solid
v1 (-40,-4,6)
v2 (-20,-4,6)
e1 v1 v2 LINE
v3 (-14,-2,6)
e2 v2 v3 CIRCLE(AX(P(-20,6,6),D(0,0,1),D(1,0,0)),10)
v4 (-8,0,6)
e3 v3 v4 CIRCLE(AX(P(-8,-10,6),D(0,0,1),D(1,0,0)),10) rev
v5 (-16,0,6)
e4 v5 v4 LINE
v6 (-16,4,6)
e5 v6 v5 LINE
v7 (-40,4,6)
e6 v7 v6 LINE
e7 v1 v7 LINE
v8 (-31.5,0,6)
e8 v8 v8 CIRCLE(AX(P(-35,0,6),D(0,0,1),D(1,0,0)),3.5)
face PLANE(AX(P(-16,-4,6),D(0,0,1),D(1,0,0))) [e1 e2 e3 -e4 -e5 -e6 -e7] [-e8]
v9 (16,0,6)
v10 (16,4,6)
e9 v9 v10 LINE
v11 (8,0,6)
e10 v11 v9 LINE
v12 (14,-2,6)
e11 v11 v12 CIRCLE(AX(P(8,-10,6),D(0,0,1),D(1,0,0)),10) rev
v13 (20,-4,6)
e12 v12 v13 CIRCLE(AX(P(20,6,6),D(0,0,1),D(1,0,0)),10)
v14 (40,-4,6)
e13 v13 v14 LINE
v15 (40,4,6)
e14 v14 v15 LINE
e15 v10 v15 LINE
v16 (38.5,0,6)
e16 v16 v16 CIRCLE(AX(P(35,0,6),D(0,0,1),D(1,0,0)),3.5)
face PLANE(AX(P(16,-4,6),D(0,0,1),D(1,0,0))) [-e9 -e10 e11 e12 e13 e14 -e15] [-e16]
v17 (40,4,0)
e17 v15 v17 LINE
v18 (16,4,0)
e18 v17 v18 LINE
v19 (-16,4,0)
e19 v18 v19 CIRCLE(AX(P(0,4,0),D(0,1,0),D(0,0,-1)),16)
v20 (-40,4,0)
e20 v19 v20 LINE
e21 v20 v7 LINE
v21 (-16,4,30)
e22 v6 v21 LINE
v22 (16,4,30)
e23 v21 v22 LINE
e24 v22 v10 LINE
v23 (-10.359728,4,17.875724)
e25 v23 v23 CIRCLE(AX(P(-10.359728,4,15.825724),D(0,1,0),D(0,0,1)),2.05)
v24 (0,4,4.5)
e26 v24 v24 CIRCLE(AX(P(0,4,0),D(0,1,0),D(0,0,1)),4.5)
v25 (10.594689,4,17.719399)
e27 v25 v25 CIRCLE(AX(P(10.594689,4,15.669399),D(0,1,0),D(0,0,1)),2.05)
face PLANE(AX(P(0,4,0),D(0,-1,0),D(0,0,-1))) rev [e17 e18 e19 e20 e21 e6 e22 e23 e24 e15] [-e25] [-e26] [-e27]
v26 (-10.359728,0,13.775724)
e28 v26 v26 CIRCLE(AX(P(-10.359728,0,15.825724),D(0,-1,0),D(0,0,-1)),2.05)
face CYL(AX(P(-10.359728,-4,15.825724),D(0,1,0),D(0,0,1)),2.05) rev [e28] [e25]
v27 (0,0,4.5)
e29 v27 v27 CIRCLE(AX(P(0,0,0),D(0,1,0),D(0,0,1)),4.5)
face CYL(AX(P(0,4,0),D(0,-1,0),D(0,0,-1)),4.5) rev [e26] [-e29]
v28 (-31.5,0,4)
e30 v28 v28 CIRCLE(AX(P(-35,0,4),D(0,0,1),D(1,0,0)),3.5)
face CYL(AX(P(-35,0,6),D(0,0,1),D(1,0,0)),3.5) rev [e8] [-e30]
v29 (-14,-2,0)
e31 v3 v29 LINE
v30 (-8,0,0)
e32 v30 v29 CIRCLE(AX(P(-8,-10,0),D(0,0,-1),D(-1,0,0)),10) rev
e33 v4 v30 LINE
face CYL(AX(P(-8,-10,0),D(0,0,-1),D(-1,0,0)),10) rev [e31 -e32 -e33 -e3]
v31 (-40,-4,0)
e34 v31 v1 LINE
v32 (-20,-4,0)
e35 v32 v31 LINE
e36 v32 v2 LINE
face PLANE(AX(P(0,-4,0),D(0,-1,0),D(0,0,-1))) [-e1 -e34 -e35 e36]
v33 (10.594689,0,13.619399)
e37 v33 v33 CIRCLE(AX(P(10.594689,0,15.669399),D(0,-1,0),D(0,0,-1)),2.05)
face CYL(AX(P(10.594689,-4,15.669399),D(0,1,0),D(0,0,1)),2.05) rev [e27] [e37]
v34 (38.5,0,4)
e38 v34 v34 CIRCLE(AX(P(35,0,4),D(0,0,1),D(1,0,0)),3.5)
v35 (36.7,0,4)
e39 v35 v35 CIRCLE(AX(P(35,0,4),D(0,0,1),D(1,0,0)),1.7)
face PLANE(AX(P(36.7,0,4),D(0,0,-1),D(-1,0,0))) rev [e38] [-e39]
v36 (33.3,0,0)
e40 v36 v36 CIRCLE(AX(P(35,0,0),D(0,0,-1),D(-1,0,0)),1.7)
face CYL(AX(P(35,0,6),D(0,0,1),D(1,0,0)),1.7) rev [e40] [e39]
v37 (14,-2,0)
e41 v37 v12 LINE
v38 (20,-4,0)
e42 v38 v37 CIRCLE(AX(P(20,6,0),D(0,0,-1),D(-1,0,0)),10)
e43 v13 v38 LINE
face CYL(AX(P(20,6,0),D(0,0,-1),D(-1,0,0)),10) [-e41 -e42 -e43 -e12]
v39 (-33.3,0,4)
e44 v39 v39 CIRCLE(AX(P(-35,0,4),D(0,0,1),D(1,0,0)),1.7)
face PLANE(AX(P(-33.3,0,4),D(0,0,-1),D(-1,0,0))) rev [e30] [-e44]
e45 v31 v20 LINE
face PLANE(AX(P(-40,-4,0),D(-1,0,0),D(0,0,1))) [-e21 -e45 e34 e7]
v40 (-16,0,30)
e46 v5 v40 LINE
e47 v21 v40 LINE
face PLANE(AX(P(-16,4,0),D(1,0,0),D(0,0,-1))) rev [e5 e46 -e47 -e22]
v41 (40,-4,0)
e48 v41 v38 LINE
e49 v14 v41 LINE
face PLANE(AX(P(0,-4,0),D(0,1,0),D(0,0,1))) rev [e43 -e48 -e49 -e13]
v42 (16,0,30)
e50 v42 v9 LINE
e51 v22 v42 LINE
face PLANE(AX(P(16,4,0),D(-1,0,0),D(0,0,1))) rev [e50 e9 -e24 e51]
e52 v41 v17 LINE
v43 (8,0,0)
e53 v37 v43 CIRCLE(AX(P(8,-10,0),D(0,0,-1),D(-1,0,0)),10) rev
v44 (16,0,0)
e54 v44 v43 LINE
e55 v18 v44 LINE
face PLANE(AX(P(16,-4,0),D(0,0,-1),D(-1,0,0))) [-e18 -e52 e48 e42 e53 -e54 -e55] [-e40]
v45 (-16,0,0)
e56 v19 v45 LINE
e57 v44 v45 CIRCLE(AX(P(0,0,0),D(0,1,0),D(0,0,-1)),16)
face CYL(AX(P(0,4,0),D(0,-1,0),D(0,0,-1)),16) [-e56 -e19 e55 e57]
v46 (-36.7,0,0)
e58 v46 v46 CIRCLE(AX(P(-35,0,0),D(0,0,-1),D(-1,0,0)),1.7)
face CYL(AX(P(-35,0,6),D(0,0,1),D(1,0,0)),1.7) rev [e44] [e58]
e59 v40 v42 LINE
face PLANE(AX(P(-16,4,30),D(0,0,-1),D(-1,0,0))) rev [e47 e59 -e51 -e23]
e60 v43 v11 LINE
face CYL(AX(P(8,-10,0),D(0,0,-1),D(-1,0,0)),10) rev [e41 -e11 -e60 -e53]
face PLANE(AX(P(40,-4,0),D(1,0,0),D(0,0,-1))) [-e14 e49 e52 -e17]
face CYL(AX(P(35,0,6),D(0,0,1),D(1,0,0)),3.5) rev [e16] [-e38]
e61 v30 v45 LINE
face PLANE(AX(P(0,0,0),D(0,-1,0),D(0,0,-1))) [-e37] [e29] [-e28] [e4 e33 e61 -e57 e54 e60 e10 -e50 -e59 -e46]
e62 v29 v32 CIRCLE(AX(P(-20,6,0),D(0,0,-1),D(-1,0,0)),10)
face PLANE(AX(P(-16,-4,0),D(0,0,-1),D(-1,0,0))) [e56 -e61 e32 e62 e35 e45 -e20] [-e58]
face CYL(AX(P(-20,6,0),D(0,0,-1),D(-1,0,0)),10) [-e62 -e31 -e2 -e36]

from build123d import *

# Parameters (mm, degrees)
SKETCH1_R                                            = 4.5
BOSS_EXTRUDE1_DEPTH                                  = 4
SKETCH2_W                                            = 24
SKETCH2_H                                            = 6
BOSS_EXTRUDE2_DEPTH                                  = 8
CBORE_FOR_M3_HEXAGON_HEAD_BOLTS_FULL_THR_D           = 3.4
CBORE_FOR_M3_HEXAGON_HEAD_BOLTS_FULL_THR_CBORE_D     = 7
CBORE_FOR_M3_HEXAGON_HEAD_BOLTS_FULL_THR_CBORE_DEPTH = 2
FILLET1_R                                            = 10
FILLET2_R                                            = 10
SKETCH4_R                                            = 2.05
SKETCH4_R_2                                          = 1.9812
CUT_EXTRUDE2_DEPTH                                   = 51.635955605


with BuildPart() as part:
    # Sketch1 → Boss-Extrude1 (new body)
    with BuildSketch(Plane(origin=(0, 0, 0), x_dir=(1, 0, 0), z_dir=(0, 1, 0))):
        with BuildLine():
            Line((-16, 0), (-16, -30))
            Line((-16, -30), (16, -30))
            Line((16, -30), (16, 0))
            ThreePointArc((16, 0), (0, 16), (-16, 0))
        make_face()
        with Locations(Location((0, 0, 0), (0, 0, 270))):
            Circle(SKETCH1_R, mode=Mode.SUBTRACT)
    extrude(amount=BOSS_EXTRUDE1_DEPTH)

    # Sketch2 → Boss-Extrude2 (add)
    with BuildSketch(Plane(origin=(0, 4, 0), x_dir=(1, 0, 0), z_dir=(0, 1, 0))):
        with Locations((28, -3)):
            Rectangle(SKETCH2_W, SKETCH2_H)
        with Locations((-28, -3)):
            Rectangle(SKETCH2_W, SKETCH2_H)
    extrude(amount=-BOSS_EXTRUDE2_DEPTH)

    # CBORE for M3 Hexagon head bolts-Full thread-grades AB1 (through all)
    with Locations(Plane(origin=(-35, 0, 6), x_dir=(1, 0, 0), z_dir=(0, 0, 1))):
        with Locations((0, 0), (70, 0)):
            CounterBoreHole(CBORE_FOR_M3_HEXAGON_HEAD_BOLTS_FULL_THR_D / 2, CBORE_FOR_M3_HEXAGON_HEAD_BOLTS_FULL_THR_CBORE_D / 2, CBORE_FOR_M3_HEXAGON_HEAD_BOLTS_FULL_THR_CBORE_DEPTH)

    # Fillet1
    # the kernel refuses this fillet: 10 mm, written as the material it adds along each edge
    with BuildSketch(Plane(origin=(16, 0, 6), x_dir=(-1, 0, 0), z_dir=(0, 0, -1)), Plane(origin=(-16, 0, 0), x_dir=(1, 0, 0), z_dir=(0, 0, 1))) as fillet1_piece_1:
        with BuildLine():
            CenterArc((8, -10), FILLET1_R, 90, 53.130102354)
            Line((0, -4), (0, 0))
            Line((0, 0), (8, 0))
        make_face()
    extrude(amount=6)

    # Fillet2
    fillet2_edges = [part.edges().sort_by_distance(p)[0] for p in [
        (16, -4, 3),
        (-16, -4, 3),
    ]]
    fillet(fillet2_edges, radius=FILLET2_R)

    # Sketch4 → Cut-Extrude2 (cut, through all)
    # profile 1 of 4: a face of its own
    with BuildSketch(Plane(origin=(0, 4, 0), x_dir=(1, 0, 0), z_dir=(0, 1, 0))):
        with Locations(Location((-10.359727729, -15.825724364, 0), (0, 0, 270))):
            Circle(SKETCH4_R)
        with Locations((-10.359727729, -15.825724364)):
            Circle(SKETCH4_R_2, mode=Mode.SUBTRACT)
    # profile 2 of 4: a face of its own
    with BuildSketch(Plane(origin=(0, 4, 0), x_dir=(1, 0, 0), z_dir=(0, 1, 0))):
        with Locations((-10.359727729, -15.825724364)):
            Circle(SKETCH4_R_2)
    # profile 3 of 4: a face of its own
    with BuildSketch(Plane(origin=(0, 4, 0), x_dir=(1, 0, 0), z_dir=(0, 1, 0))):
        with Locations(Location((10.594689167, -15.669399213, 0), (0, 0, 270))):
            Circle(SKETCH4_R)
        with Locations((10.594689167, -15.669399213)):
            Circle(SKETCH4_R_2, mode=Mode.SUBTRACT)
    # profile 4 of 4: a face of its own
    with BuildSketch(Plane(origin=(0, 4, 0), x_dir=(1, 0, 0), z_dir=(0, 1, 0))):
        with Locations((10.594689167, -15.669399213)):
            Circle(SKETCH4_R_2)
    extrude(amount=-CUT_EXTRUDE2_DEPTH, mode=Mode.SUBTRACT)


solid = part.part
